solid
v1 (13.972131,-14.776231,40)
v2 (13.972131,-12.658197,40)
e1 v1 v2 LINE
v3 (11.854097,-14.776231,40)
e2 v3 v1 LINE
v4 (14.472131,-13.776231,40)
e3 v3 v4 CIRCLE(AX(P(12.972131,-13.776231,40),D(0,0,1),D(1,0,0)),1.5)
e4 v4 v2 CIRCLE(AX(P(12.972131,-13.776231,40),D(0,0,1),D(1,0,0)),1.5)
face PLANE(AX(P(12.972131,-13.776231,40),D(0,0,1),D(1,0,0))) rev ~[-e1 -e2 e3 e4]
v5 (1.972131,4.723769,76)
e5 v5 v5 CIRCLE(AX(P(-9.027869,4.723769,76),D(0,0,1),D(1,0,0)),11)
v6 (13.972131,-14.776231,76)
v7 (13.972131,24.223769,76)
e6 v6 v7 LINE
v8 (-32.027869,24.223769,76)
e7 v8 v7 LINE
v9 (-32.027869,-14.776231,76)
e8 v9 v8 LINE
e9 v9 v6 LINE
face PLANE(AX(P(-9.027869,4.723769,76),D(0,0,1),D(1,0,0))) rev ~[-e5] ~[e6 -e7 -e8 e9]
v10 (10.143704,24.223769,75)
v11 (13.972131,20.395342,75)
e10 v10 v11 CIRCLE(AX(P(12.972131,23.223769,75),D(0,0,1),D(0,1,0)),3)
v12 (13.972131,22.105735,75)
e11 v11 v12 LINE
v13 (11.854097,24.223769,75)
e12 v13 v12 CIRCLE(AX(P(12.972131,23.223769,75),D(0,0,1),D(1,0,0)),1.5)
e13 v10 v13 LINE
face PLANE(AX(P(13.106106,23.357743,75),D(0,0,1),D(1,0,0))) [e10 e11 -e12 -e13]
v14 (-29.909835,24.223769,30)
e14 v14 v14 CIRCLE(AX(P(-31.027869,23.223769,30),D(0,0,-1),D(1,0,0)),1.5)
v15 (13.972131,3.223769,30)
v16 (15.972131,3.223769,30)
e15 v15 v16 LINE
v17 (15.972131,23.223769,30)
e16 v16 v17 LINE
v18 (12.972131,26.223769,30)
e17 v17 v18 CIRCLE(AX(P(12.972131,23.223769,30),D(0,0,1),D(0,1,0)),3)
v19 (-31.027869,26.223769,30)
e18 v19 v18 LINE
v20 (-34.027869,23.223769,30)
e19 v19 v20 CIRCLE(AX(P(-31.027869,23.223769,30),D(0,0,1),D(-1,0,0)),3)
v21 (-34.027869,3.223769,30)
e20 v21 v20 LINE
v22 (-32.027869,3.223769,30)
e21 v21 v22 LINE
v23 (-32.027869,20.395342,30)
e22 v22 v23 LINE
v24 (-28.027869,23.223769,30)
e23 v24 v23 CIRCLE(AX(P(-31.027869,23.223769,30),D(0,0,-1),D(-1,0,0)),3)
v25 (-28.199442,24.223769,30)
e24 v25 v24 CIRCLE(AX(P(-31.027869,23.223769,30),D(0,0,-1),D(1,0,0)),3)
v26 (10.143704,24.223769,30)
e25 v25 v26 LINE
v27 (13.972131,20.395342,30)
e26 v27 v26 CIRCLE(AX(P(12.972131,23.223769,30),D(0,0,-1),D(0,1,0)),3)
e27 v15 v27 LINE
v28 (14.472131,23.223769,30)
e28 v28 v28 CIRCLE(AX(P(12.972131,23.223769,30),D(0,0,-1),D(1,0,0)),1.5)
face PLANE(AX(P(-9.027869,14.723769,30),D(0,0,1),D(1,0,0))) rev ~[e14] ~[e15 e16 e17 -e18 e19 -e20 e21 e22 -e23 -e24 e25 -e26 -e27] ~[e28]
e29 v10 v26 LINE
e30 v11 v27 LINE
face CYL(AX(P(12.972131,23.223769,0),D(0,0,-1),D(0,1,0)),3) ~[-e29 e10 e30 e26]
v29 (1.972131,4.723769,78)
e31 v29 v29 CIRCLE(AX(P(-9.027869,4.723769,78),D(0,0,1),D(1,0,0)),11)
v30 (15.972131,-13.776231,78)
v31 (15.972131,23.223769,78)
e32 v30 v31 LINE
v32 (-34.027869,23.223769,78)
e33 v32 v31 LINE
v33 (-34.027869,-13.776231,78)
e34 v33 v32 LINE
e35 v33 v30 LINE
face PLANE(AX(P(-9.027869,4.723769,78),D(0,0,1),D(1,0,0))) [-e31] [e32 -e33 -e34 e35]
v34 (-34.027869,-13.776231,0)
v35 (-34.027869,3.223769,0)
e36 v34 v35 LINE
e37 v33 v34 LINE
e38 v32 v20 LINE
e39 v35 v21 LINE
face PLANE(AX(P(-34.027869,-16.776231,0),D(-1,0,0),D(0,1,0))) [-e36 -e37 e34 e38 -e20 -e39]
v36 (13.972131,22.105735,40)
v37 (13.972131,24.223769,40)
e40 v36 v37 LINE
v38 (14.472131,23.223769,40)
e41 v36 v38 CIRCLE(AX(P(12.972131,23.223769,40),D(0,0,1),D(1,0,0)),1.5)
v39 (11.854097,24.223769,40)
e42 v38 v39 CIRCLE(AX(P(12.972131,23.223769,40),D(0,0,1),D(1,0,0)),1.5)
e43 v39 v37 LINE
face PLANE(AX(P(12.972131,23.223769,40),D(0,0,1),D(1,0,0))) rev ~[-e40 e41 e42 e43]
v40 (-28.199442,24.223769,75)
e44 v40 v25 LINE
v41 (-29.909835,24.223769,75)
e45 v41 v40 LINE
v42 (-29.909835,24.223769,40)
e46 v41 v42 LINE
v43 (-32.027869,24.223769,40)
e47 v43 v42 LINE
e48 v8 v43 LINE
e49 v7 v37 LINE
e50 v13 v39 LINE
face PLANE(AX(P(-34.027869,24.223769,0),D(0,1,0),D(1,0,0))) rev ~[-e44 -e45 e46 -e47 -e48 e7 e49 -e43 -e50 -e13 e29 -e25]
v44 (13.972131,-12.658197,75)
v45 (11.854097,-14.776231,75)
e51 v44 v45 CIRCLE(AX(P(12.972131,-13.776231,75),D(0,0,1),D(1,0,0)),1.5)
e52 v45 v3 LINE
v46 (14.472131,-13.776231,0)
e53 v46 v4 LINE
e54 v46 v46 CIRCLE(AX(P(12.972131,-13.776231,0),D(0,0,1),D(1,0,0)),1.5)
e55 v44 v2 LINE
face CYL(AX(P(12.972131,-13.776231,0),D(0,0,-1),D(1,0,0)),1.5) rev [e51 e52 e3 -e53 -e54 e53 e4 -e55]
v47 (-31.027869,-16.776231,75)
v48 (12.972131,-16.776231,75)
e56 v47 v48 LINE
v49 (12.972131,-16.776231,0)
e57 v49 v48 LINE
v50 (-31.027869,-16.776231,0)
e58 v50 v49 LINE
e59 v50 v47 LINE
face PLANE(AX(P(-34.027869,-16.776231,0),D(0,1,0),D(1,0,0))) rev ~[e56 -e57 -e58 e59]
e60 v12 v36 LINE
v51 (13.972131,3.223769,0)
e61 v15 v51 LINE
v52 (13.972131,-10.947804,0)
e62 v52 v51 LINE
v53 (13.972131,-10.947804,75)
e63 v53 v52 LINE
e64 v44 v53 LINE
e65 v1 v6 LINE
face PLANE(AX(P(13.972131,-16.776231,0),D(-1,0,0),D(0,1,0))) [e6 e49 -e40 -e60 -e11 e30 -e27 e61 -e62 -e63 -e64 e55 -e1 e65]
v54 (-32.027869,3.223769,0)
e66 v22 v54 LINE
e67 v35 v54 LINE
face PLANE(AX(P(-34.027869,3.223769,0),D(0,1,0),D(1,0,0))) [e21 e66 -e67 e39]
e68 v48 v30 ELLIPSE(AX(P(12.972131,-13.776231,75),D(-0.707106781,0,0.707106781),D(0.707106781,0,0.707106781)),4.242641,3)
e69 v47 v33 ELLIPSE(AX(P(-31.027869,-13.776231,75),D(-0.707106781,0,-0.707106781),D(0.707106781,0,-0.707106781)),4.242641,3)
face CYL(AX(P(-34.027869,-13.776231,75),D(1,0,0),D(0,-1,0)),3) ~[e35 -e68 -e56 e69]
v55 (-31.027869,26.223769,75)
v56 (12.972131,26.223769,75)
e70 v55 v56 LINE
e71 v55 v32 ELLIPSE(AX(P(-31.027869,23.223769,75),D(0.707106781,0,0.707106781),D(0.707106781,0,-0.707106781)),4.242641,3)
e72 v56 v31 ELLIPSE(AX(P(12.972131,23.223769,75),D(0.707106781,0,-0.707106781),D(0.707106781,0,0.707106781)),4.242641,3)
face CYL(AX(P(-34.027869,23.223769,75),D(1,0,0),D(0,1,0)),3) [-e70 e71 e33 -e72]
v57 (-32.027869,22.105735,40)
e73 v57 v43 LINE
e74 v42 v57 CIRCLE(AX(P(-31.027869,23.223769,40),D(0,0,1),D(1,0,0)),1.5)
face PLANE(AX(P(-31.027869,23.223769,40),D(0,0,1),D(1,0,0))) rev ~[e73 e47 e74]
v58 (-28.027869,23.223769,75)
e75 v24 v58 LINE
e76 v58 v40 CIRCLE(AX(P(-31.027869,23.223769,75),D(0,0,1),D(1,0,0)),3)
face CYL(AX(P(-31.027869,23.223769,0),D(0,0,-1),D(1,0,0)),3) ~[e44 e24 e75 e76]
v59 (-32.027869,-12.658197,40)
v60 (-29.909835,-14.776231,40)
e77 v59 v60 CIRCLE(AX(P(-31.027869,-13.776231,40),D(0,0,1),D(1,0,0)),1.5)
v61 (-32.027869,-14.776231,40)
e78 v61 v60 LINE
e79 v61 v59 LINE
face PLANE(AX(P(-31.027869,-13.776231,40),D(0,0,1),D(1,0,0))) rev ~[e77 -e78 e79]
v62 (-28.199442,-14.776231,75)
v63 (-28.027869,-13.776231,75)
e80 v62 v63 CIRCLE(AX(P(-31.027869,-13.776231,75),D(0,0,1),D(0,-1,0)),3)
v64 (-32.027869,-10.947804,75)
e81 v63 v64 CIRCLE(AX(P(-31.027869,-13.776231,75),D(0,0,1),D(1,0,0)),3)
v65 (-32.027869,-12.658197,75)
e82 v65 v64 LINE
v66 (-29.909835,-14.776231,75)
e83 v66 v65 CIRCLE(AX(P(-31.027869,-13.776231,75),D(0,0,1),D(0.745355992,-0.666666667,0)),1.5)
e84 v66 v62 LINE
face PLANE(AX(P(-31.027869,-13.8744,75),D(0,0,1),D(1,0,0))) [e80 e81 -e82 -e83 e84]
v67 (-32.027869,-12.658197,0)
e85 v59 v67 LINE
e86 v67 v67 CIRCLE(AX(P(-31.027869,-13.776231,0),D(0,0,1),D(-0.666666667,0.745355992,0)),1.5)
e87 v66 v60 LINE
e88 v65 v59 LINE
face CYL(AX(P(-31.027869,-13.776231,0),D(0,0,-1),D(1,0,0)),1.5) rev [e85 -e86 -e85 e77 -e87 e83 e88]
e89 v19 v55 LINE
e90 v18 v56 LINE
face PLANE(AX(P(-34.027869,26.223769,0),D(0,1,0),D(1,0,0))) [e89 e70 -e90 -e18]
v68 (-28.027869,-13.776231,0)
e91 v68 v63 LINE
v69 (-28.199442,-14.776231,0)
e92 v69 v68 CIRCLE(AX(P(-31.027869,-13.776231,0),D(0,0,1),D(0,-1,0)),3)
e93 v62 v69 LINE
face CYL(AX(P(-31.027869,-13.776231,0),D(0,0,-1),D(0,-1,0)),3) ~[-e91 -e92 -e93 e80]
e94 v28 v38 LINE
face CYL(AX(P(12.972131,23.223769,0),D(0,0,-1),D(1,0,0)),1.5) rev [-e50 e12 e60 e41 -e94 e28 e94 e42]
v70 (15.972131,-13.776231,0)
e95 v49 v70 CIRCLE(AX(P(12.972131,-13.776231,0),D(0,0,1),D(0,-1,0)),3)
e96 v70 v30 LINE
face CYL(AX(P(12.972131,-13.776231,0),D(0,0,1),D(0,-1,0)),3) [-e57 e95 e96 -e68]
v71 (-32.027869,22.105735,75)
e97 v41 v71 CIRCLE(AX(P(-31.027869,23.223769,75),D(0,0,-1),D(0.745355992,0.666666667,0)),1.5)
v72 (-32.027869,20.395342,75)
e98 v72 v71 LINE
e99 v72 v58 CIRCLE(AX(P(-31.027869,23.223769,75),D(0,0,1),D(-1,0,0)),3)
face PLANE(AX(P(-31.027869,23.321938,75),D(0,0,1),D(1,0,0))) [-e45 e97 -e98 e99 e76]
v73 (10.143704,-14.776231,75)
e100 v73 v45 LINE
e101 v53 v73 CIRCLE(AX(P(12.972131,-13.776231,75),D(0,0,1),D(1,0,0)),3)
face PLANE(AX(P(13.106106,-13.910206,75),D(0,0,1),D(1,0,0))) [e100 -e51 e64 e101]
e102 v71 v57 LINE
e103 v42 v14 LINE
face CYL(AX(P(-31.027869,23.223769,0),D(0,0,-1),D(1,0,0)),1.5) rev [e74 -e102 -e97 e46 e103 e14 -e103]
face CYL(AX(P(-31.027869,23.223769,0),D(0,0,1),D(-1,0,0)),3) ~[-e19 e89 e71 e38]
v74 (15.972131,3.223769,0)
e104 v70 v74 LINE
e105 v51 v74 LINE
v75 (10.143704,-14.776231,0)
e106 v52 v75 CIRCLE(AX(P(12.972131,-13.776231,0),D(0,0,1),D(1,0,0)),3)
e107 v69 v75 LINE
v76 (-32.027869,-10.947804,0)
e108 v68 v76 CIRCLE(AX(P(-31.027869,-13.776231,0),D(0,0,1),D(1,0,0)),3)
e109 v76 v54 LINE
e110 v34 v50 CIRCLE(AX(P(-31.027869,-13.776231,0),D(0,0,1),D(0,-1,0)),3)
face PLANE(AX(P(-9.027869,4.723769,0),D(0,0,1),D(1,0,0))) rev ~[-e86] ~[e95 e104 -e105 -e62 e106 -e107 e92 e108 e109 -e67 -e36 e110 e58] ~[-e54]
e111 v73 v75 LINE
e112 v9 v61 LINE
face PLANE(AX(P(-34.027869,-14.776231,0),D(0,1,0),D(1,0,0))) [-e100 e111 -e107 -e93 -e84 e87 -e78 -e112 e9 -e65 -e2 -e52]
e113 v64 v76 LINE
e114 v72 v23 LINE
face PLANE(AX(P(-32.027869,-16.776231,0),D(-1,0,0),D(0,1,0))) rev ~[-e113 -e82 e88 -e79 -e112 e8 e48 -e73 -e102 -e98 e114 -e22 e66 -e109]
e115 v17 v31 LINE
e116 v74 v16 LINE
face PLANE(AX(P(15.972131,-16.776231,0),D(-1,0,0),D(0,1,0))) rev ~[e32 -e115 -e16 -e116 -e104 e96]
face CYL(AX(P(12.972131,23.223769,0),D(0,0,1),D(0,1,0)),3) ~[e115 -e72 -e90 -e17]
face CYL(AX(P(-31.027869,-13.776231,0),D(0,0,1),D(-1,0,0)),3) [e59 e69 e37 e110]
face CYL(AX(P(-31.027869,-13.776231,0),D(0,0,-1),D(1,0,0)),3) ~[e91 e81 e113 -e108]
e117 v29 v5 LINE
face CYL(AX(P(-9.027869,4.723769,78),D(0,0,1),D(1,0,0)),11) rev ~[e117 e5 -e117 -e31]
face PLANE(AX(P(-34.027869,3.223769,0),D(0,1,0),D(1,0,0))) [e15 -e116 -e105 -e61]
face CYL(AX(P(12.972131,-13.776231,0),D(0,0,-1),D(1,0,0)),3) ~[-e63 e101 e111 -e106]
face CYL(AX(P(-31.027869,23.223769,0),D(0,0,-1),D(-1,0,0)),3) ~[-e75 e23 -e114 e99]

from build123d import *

# Parameters (mm, degrees)
F0_W      = 50
F0_H      = 43
F0_R      = 1.5
F1_DEPTH  = 78
F3_T      = -2
F2_R      = 11
F4_DEPTH  = 3.1
F5_R      = 3
F6_R      = 1.5
F7_DEPTH  = 75
F8_DEPTH  = 40
F9_W      = 50
F9_H      = 23
F10_DEPTH = 30


# Not quite as in the source:
# - a feature names something its author has since deleted; it is built from what else it names


with BuildPart() as f1:
    # F0 (on Top) → F1 (new body)
    with BuildSketch(Plane.XY):
        with Locations((-9.0278687937, 4.7237686813)):
            Rectangle(F0_W, F0_H)
        with Locations((-31.0278687937, -13.7762313187)):
            Circle(F0_R, mode=Mode.SUBTRACT)
        with Locations((12.9721312063, -13.7762313187)):
            Circle(F0_R, mode=Mode.SUBTRACT)
        with Locations((-31.0278687937, 23.2237686813)):
            Circle(F0_R, mode=Mode.SUBTRACT)
        with Locations((12.9721312063, 23.2237686813)):
            Circle(F0_R, mode=Mode.SUBTRACT)
        with Locations((12.9721312063, 23.2237686813)):
            Circle(F0_R)
        with Locations((12.9721312063, -13.7762313187)):
            Circle(F0_R)
        with Locations((-31.0278687937, -13.7762313187)):
            Circle(F0_R)
        with Locations((-31.0278687937, 23.2237686813)):
            Circle(F0_R)
    extrude(amount=F1_DEPTH)

    # F3
    f3_openings = [f1.faces().sort_by_distance(p)[0] for p in [
        (-9.027869, 4.723769, 0),
    ]]
    offset(amount=F3_T, openings=f3_openings)

    # F2 (on face) → F4 (cut)
    with BuildSketch(Plane.XY.offset(78)):
        with Locations((-9.0278687937, 4.7237686813)):
            Circle(F2_R)
    extrude(amount=-F4_DEPTH, mode=Mode.SUBTRACT)

    # F5
    f5_edges = [f1.edges().sort_by_distance(p)[0] for p in [
        (15.972131, 26.223769, 39),
        (-9.027869, 26.223769, 78),
        (-34.027869, 26.223769, 39),
        (15.972131, -16.776231, 39),
        (-9.027869, -16.776231, 78),
        (-34.027869, -16.776231, 39),
    ]]
    fillet(f5_edges, radius=F5_R)

    # F6 (on face) → F7 (join)
    with BuildSketch(Plane.XY):
        with BuildLine():
            ThreePointArc((12.9721312104, -16.7762313187), (15.0934515513, -15.8975516608), (15.9721312063, -13.7762313187))
            ThreePointArc((15.9721312063, -13.7762313187), (10.8508108613, -11.6549109766), (12.9721312104, -16.7762313187))
        make_face()
        with Locations((12.9721312063, -13.7762313187)):
            Circle(F6_R, mode=Mode.SUBTRACT)
        with BuildLine():
            ThreePointArc((12.9721312063, 26.2237686813), (10.8508108627, 21.1024483377), (15.9721312063, 23.2237686813))
            ThreePointArc((15.9721312063, 23.2237686813), (15.0934515498, 25.3450890248), (12.9721312063, 26.2237686813))
        make_face()
        with Locations((12.9721312063, 23.2237686813)):
            Circle(F6_R, mode=Mode.SUBTRACT)
        with BuildLine():
            ThreePointArc((-34.0278687937, -13.776231286), (-33.1491891488, -15.8975516507), (-31.0278687937, -16.7762313187))
            ThreePointArc((-31.0278687937, -16.7762313187), (-28.9065484502, -15.8975516623), (-28.0278687937, -13.7762313187))
            ThreePointArc((-28.0278687937, -13.7762313187), (-31.0278687774, -10.7762313187), (-34.0278687937, -13.776231286))
        make_face()
        with Locations((-31.0278687937, -13.7762313187)):
            Circle(F6_R, mode=Mode.SUBTRACT)
        with BuildLine():
            ThreePointArc((-28.0278687937, 23.2237686813), (-28.9065484366, 25.3450890113), (-31.0278687555, 26.2237686813))
            ThreePointArc((-31.0278687555, 26.2237686813), (-33.1491891237, 25.3450890384), (-34.0278687937, 23.2237686813))
            ThreePointArc((-34.0278687937, 23.2237686813), (-31.0278687937, 20.2237686813), (-28.0278687937, 23.2237686813))
        make_face()
        with Locations((-31.0278687937, 23.2237686813)):
            Circle(F6_R, mode=Mode.SUBTRACT)
    extrude(amount=F7_DEPTH)

    # F0 (on Top) → F8 (cut)
    with BuildSketch(Plane.XY):
        with Locations((-31.0278687937, 23.2237686813)):
            Circle(F0_R)
        with Locations((12.9721312063, 23.2237686813)):
            Circle(F0_R)
        with Locations((-31.0278687937, -13.7762313187)):
            Circle(F0_R)
        with Locations((12.9721312063, -13.7762313187)):
            Circle(F0_R)
    extrude(amount=F8_DEPTH, mode=Mode.SUBTRACT)

    # F9 (on Top) → F10 (cut)
    with BuildSketch(Plane.XY):
        with Locations((-9.0278687937, 14.7237686813)):
            Rectangle(F9_W, F9_H)
    extrude(amount=F10_DEPTH, mode=Mode.SUBTRACT)


solid = f1.part
